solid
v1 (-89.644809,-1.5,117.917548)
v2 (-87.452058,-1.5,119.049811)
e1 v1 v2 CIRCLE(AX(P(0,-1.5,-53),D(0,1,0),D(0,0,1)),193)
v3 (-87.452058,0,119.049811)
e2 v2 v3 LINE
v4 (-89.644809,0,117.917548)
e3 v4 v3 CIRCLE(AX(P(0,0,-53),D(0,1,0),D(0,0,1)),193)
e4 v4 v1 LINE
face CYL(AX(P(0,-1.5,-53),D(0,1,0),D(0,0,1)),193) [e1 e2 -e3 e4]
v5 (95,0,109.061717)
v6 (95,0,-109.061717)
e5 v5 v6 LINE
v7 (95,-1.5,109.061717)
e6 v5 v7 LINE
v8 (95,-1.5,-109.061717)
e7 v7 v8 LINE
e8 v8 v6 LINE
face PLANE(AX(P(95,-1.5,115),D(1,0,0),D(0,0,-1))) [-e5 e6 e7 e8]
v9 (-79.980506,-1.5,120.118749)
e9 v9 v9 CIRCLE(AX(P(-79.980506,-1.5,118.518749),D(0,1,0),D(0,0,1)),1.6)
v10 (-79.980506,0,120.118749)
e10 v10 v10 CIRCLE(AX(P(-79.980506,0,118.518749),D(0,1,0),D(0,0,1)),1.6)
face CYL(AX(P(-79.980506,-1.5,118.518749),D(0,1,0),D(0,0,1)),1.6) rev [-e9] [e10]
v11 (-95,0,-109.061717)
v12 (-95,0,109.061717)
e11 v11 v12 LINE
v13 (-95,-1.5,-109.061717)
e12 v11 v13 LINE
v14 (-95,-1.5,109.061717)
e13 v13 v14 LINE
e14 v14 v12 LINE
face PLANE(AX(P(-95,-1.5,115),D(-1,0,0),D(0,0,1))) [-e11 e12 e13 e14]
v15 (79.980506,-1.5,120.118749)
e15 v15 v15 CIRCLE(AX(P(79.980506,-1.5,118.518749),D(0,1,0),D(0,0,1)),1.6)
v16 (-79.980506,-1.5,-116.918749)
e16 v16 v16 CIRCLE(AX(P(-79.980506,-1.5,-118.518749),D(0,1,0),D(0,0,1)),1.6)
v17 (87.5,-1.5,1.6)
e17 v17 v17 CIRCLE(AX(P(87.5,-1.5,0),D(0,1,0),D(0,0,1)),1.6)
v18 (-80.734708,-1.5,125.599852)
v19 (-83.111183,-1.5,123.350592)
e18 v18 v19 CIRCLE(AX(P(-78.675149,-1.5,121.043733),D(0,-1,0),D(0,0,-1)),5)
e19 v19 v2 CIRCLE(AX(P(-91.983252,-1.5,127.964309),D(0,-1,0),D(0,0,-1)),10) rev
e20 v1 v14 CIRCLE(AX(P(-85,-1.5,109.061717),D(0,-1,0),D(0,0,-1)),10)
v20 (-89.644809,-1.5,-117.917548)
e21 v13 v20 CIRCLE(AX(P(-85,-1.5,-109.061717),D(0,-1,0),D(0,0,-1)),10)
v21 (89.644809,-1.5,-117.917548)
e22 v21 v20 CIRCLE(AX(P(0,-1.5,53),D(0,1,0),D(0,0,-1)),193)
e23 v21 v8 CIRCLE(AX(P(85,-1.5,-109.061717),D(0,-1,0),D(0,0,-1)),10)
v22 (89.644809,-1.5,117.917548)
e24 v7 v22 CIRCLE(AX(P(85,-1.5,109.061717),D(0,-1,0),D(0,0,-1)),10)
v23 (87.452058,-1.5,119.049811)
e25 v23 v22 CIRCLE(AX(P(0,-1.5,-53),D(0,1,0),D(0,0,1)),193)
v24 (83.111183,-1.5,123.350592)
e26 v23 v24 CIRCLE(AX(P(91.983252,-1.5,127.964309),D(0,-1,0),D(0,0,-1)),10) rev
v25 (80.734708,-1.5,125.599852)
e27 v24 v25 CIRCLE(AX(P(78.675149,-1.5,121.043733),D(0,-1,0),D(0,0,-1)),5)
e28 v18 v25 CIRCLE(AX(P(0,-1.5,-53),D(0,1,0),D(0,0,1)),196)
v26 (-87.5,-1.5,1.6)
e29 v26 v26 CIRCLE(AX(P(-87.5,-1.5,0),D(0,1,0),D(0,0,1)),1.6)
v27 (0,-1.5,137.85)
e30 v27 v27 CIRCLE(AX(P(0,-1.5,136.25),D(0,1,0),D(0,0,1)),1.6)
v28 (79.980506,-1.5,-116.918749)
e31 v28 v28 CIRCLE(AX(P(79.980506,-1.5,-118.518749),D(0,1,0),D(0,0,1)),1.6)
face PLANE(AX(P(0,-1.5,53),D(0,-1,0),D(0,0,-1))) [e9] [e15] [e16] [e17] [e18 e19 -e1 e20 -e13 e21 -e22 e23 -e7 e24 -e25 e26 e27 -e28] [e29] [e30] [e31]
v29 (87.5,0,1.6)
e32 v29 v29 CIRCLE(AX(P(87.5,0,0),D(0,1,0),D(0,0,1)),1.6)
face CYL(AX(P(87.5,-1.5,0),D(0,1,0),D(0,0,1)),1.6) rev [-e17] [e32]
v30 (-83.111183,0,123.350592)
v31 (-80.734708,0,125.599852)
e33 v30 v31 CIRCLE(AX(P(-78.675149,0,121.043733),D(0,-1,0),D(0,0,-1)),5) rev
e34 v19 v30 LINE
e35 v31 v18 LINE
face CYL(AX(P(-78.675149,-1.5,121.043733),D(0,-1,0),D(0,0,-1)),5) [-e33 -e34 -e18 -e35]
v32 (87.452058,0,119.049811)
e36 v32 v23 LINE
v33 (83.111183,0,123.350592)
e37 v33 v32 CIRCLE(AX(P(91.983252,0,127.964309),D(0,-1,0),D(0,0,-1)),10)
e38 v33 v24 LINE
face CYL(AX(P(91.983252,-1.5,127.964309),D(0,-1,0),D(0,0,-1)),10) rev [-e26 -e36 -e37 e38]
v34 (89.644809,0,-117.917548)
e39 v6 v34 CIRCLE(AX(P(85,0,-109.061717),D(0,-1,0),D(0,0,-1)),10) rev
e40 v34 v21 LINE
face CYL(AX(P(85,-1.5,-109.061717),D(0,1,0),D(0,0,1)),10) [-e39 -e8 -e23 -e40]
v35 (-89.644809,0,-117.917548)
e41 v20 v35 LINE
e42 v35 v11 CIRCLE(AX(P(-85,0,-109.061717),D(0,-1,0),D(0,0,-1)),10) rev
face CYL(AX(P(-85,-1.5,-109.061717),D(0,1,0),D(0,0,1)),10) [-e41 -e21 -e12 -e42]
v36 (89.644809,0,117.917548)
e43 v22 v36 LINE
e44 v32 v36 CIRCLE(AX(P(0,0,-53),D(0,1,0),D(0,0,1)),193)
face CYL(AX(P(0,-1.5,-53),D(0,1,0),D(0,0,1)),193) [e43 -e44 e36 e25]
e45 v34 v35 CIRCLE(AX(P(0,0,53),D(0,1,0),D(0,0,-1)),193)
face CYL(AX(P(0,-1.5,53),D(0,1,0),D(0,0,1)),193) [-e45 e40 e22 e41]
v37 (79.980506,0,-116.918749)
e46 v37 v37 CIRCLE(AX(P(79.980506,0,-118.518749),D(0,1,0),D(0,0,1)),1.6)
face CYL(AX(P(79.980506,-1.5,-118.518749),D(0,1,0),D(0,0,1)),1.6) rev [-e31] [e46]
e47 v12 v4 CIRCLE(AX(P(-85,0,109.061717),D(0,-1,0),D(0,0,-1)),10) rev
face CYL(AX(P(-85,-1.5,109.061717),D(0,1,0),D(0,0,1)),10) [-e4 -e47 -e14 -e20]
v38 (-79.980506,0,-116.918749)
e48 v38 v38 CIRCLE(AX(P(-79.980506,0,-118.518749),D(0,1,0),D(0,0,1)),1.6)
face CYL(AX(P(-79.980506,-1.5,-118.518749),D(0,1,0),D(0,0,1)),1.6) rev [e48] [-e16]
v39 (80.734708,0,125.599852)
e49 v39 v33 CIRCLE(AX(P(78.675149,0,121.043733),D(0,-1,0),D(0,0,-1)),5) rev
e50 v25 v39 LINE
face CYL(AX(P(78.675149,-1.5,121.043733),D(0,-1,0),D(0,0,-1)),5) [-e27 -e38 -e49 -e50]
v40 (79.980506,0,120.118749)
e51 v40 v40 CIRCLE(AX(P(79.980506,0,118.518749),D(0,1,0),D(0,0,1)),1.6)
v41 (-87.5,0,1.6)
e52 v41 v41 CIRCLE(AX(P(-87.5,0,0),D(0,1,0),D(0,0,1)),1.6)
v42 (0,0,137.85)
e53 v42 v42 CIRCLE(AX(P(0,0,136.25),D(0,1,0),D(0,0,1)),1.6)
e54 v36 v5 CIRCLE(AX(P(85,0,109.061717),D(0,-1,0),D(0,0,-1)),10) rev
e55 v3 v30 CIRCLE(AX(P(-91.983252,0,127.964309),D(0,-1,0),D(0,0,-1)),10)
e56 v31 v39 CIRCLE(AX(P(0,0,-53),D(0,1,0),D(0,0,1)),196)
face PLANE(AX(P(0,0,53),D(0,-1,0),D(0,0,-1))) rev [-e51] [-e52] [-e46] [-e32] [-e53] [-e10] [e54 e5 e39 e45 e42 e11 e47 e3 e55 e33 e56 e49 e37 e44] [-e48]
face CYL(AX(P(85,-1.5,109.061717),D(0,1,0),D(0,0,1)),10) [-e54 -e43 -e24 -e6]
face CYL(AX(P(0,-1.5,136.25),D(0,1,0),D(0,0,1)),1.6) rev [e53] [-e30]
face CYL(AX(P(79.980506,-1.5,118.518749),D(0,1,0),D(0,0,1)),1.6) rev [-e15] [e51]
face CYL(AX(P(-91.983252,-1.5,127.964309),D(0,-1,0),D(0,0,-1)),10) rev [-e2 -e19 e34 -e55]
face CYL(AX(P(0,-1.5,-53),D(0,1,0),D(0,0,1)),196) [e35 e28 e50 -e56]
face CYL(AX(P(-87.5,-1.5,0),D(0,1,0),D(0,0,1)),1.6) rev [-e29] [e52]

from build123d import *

# Parameters (mm, degrees)
BASE_FLANGE1_DEPTH = 1.5
TAB1_DEPTH         = 1.5
FILLET1_R          = 10
FILLET2_R          = 5
SKETCH9_R          = 1.6
CUT_EXTRUDE1_DEPTH = 172.686487668


# Sheet-metal steps are written as plain solids
with BuildPart() as part:
    # Base-Flange1: sheet metal written as solids
    # Sketch1 → Base-Flange1 (new body)
    with BuildSketch(Plane(origin=(0, 0, 0), x_dir=(1, 0, 0), z_dir=(0, 1, 0))):
        with BuildLine():
            Line((95, -115), (95, 115))
            ThreePointArc((95, 115), (0, 140), (-95, 115))
            Line((-95, 115), (-95, -115))
            ThreePointArc((-95, -115), (0, -140), (95, -115))
        make_face()
    extrude(amount=-BASE_FLANGE1_DEPTH)

    # Tab1: sheet metal written as solids
    # Sketch2 → Tab1 (add)
    with BuildSketch(Plane(origin=(0, 0, 0), x_dir=(1, 0, 0), z_dir=(0, 1, 0))):
        with BuildLine():
            Line((-82.5, -124.791310249), (-82.5, -121.478508705))
            ThreePointArc((-82.5, -121.478508705), (0, -140), (82.5, -121.478508705))
            Line((82.5, -121.478508705), (82.5, -124.791310249))
            ThreePointArc((82.5, -124.791310249), (0, -143), (-82.5, -124.791310249))
        make_face()
    extrude(amount=-TAB1_DEPTH)

    # Fillet1
    # the kernel refuses this fillet: 10 mm, written as the material it adds along each edge
    with BuildSketch(Plane(origin=(-82.5, 0, 121.478508705), x_dir=(-0.8978334247322157, 0, -0.4403352602661074), z_dir=(0, -1, 0))) as fillet1_piece_1:
        with BuildLine():
            CenterArc((5.658454261, -9.998979067), FILLET1_R, 90.818728741, 44.556283737)
            Line((-1.45874333, -2.974343955), (0, 0))
            ThreePointArc((0, 0), (2.757782001, -0.019704015), (5.515564002, 0))
        make_face()
    extrude(amount=1.5)
    with BuildSketch(Plane(origin=(82.5, 0, 121.478508705), x_dir=(0.8978334247322127, 0, -0.44033526026611364), z_dir=(0, -1, 0))) as fillet1_piece_2:
        with BuildLine():
            CenterArc((5.658454261, 9.998979067), FILLET1_R, 224.624987522, 44.556283737)
            Line((-1.45874333, 2.974343955), (0, 0))
            ThreePointArc((0, 0), (2.757782001, 0.019704015), (5.515564002, 0))
        make_face()
    extrude(amount=1.5)
    # the kernel refuses this fillet: 10 mm, written as the material it takes off along each edge
    with BuildSketch(Plane(origin=(-95, 15.245934007, 115), x_dir=(0, 0, -1), z_dir=(0, -1, 0))) as fillet1_2_piece_1:
        with BuildLine():
            CenterArc((5.938283361, 10), FILLET1_R, 207.676630301, 62.323369699)
            ThreePointArc((-2.917548149, 5.355191257), (-1.479926921, 2.6660714), (0, 0))
            Line((0, 0), (5.938283361, 0))
        make_face()
    extrude(amount=31.991868015, mode=Mode.SUBTRACT)
    with BuildSketch(Plane(origin=(95, 15.245934007, 115), x_dir=(0, 0, -1), z_dir=(0, -1, 0)), Plane(origin=(-95, 15.245934007, -115), x_dir=(0, 0, 1), z_dir=(0, -1, 0))) as fillet1_2_piece_2:
        with BuildLine():
            CenterArc((5.938283361, -10), FILLET1_R, 90, 62.323369699)
            ThreePointArc((-2.917548149, -5.355191257), (-1.479926921, -2.6660714), (0, 0))
            Line((0, 0), (5.938283361, 0))
        make_face()
    extrude(amount=31.991868015, mode=Mode.SUBTRACT)
    with BuildSketch(Plane(origin=(95, 15.245934007, -115), x_dir=(-0.8781343363797829, 0, -0.47841413782500014), z_dir=(0, -1, 0))) as fillet1_2_piece_3:
        with BuildLine():
            CenterArc((5.94038465, -9.998751897), FILLET1_R, 89.094752314, 62.323369699)
            Line((-2.840958714, -5.214610518), (0, 0))
            ThreePointArc((0, 0), (3.049186801, 0.024088395), (6.098373603, 0))
        make_face()
    extrude(amount=31.991868015, mode=Mode.SUBTRACT)

    # Fillet2
    fillet2_edges = [part.edges().sort_by_distance(p)[0] for p in [
        (82.5, -0.75, 124.791310249),
        (-82.5, -0.75, 124.791310249),
    ]]
    fillet(fillet2_edges, radius=FILLET2_R)

    # Sketch9 → Cut-Extrude1 (cut, through all)
    with BuildSketch(Plane(origin=(0, 0, 0), x_dir=(1, 0, 0), z_dir=(0, 1, 0))):
        with Locations(Location((-79.980506034, 118.518748697, 0), (0, 0, 270))):
            Circle(SKETCH9_R)
        with Locations(Location((79.980506034, 118.518748697, 0), (0, 0, 270))):
            Circle(SKETCH9_R)
        with Locations(Location((-79.980506034, -118.518748697, 0), (0, 0, 270))):
            Circle(SKETCH9_R)
        with Locations(Location((0, -136.25, 0), (0, 0, 270))):
            Circle(SKETCH9_R)
        with Locations(Location((79.980506034, -118.518748697, 0), (0, 0, 270))):
            Circle(SKETCH9_R)
        with Locations(Location((87.5, 0, 0), (0, 0, 270))):
            Circle(SKETCH9_R)
        with Locations(Location((-87.5, 0, 0), (0, 0, 270))):
            Circle(SKETCH9_R)
    extrude(amount=-CUT_EXTRUDE1_DEPTH, mode=Mode.SUBTRACT)


solid = part.part
